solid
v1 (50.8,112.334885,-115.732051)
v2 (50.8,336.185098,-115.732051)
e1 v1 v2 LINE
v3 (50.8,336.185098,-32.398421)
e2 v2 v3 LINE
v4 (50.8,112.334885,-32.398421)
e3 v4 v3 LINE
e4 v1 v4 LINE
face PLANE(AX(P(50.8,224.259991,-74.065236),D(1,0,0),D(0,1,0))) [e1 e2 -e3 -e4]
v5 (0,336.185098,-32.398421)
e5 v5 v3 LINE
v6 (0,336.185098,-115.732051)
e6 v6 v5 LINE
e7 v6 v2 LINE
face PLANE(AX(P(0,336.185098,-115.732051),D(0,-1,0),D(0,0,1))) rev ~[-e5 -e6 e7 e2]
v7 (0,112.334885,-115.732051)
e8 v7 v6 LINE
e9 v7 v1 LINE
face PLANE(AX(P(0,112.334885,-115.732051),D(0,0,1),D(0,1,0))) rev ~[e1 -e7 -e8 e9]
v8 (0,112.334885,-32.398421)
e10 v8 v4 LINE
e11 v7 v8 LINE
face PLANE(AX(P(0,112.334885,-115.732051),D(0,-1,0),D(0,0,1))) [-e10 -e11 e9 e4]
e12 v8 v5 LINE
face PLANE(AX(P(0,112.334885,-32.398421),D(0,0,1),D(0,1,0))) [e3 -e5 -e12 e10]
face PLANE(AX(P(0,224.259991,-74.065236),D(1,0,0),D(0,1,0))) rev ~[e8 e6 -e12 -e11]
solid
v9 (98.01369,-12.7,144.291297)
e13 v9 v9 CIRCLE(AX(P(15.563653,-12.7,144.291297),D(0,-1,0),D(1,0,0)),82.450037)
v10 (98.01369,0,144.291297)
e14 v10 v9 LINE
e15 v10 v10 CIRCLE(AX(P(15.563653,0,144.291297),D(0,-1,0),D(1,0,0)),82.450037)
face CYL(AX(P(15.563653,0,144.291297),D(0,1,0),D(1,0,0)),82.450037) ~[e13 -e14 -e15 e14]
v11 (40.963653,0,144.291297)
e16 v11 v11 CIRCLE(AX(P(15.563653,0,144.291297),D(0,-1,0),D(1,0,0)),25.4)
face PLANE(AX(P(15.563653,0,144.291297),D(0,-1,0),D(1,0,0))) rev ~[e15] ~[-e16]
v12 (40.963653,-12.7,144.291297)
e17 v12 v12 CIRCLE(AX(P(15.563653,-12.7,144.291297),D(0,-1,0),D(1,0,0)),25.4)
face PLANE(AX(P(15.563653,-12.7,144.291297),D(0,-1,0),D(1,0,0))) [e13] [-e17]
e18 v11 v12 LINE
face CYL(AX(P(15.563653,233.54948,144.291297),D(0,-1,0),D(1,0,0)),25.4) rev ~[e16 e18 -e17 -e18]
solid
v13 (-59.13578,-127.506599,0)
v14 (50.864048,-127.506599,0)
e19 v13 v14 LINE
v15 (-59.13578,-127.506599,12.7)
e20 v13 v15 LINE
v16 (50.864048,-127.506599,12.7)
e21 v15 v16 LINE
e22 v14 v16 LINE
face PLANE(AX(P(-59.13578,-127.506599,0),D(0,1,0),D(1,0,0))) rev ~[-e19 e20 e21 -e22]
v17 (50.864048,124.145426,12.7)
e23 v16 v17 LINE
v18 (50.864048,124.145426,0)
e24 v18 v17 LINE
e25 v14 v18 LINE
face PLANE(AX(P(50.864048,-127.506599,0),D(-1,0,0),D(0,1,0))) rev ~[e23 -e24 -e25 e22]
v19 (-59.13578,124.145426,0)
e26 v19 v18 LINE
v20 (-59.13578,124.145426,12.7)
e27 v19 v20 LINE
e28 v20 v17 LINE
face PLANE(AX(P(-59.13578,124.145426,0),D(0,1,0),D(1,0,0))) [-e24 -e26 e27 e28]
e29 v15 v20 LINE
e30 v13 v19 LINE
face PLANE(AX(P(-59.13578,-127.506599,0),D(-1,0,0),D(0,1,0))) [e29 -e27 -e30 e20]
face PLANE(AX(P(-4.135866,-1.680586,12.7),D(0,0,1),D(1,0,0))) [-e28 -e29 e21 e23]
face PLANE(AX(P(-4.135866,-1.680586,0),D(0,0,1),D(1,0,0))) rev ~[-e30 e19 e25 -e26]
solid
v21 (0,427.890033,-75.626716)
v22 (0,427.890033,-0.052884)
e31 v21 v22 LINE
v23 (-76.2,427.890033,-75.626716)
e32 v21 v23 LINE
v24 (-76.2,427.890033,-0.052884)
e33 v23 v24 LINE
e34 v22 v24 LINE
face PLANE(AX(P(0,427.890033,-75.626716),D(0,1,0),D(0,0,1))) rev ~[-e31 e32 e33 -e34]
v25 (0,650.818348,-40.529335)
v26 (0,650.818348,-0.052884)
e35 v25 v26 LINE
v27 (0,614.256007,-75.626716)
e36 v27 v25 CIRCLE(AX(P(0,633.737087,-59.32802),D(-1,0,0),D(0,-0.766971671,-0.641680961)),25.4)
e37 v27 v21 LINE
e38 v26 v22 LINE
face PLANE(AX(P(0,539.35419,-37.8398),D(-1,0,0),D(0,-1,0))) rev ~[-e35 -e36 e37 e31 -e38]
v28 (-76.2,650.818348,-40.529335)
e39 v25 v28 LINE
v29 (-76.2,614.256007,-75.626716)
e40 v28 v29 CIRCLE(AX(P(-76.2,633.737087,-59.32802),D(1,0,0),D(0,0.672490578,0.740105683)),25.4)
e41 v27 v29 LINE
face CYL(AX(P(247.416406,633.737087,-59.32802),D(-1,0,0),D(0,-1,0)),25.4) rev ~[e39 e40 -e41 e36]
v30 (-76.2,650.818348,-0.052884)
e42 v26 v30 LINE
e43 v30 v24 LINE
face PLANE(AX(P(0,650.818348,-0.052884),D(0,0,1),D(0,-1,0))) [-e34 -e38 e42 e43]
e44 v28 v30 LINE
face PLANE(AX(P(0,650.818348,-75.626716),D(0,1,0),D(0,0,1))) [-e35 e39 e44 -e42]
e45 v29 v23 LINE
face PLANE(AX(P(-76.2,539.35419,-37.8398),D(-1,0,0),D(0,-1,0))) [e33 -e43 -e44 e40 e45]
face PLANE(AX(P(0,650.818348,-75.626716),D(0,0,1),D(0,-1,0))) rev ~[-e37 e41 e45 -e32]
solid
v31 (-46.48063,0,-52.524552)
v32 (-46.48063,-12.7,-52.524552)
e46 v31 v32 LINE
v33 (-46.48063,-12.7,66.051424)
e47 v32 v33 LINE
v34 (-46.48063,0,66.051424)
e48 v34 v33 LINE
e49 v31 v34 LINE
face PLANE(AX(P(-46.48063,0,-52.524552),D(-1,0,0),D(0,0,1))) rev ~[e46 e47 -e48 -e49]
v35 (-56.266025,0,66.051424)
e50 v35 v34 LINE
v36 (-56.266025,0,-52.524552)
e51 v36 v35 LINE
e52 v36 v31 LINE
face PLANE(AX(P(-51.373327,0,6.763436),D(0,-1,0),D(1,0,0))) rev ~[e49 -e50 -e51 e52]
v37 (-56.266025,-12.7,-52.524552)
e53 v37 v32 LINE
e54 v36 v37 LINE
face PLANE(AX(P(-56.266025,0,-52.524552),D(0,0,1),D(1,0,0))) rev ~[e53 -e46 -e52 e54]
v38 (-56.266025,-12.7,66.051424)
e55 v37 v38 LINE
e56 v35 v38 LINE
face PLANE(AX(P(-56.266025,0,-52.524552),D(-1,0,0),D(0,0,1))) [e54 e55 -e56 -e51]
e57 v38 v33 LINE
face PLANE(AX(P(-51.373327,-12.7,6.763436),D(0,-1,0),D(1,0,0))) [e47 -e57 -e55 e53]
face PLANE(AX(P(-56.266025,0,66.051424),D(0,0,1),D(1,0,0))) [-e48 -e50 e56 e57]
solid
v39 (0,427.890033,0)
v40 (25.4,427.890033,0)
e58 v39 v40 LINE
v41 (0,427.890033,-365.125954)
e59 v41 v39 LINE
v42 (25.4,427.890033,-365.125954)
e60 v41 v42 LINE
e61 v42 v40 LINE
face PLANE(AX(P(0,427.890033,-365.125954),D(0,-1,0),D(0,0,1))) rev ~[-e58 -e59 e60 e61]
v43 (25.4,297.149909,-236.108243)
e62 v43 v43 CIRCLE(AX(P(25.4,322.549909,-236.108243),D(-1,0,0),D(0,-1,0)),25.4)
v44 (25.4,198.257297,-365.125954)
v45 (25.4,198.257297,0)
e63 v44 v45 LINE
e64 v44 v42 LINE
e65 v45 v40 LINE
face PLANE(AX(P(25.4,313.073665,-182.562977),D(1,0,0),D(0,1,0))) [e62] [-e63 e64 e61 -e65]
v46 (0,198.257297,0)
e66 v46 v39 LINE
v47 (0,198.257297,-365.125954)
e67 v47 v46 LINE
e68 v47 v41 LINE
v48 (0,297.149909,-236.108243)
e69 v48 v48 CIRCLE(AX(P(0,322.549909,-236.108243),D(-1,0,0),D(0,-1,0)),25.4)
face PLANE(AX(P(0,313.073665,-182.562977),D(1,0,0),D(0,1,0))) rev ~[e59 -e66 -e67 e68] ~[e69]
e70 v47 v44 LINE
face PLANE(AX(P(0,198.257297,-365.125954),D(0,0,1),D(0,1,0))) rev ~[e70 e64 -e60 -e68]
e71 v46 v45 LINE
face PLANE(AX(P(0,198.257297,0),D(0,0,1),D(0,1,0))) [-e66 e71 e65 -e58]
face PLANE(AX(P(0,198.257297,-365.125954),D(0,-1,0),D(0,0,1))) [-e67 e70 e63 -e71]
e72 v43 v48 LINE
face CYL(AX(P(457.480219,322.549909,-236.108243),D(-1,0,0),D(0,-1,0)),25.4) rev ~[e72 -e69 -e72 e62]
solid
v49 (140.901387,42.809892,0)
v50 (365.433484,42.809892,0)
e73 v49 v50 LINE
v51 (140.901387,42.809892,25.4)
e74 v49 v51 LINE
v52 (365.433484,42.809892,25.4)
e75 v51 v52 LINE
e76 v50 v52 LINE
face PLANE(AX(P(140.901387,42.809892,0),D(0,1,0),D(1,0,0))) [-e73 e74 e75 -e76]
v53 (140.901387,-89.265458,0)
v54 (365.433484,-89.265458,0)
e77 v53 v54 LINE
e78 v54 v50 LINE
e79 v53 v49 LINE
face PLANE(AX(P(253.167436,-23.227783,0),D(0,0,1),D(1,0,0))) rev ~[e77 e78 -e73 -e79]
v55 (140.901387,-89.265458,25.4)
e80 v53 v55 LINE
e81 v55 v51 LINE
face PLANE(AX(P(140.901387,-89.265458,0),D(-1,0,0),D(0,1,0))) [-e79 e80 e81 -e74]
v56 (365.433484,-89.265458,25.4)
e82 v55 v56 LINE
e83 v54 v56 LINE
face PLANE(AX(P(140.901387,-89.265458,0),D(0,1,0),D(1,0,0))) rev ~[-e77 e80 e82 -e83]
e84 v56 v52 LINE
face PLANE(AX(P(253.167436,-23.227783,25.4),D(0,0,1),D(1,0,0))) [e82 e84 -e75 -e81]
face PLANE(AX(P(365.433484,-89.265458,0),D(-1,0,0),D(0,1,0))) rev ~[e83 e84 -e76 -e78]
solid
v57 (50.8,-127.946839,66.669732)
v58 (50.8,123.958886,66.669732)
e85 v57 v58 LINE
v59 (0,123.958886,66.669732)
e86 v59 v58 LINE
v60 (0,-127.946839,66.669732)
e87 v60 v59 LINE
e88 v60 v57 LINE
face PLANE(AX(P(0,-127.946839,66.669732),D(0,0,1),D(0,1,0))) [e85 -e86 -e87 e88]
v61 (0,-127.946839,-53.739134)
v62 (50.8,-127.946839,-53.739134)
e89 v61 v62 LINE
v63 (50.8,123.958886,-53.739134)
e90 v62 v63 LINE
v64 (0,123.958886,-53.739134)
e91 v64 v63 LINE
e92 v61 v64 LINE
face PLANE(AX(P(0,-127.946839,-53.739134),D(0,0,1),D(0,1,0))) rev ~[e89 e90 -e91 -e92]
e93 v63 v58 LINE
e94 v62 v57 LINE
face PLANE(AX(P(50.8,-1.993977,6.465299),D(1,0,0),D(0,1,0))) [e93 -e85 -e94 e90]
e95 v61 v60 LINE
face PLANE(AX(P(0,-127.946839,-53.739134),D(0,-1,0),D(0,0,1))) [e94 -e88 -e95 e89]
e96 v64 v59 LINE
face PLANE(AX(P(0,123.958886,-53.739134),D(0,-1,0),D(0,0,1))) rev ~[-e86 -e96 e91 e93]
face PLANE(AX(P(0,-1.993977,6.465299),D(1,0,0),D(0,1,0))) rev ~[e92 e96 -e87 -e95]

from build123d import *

# Parameters (mm, degrees)
F0_W      = 251.9057244062
F0_H      = 120.4088665545
F1_DEPTH  = 50.8
F2_W      = 9.7853951156
F2_H      = 118.5759752989
F3_DEPTH  = 12.7
F5_DEPTH  = 12.7
F6_W      = 109.9998280406
F6_H      = 251.6520246863
F7_DEPTH  = 12.7
F9_D      = 50.8
F10_W     = 224.532097578
F10_H     = 132.0753507316
F11_DEPTH = 25.4
F12_W     = 229.6327352524
F12_H     = 365.1259541512
F13_DEPTH = 25.4
F18_W     = 223.8502129912
F18_H     = 83.3336301148
F19_DEPTH = 50.8
F20_W     = 222.9283154011
F20_H     = 75.5738317966
F21_DEPTH = 76.2
F23_D     = 50.8
F25_D     = 50.8


# Not quite as in the source:
# - the program builds the solid bodies; features that only make, move or delete a surface that nothing else refers to are left out


with BuildPart() as f1:
    # F0 (on Right) → F1 (new body)
    with BuildSketch(Plane.YZ):
        with Locations((-1.9939765334, 6.465299055)):
            Rectangle(F0_W, F0_H)
    extrude(amount=F1_DEPTH)


with BuildPart() as f3:
    # F2 (on Front) → F3 (new body)
    with BuildSketch(Plane.XZ):
        with Locations((-51.3733271509, 6.7634359002)):
            Rectangle(F2_W, F2_H)
    extrude(amount=F3_DEPTH)


with BuildPart() as f5:
    # F4 (on Front) → F5 (new body)
    with BuildSketch(Plane.XZ):
        with BuildLine():
            ThreePointArc((39.5767722748, 65.4155793169), (81.8127708761, 95.209089617), (98.0136903376, 144.2912966013))
            ThreePointArc((98.0136903376, 144.2912966013), (-50.6854651748, 193.3735035856), (39.5767722748, 65.4155793169))
        make_face()
    extrude(amount=F5_DEPTH)

    # F9 (through all)
    with Locations(Plane(origin=(0, 0, 0), x_dir=(-1, 0, 0), z_dir=(0, 1, 0))):
        with Locations((-15.5636528507, 144.2912966013)):
            Hole(F9_D / 2)


with BuildPart() as f7:
    # F6 (on Top) → F7 (new body)
    with BuildSketch(Plane.XY):
        with Locations((-4.1358657181, -1.6805864871)):
            Rectangle(F6_W, F6_H)
    extrude(amount=F7_DEPTH)


with BuildPart() as f11:
    # F10 (on Top) → F11 (new body)
    with BuildSketch(Plane.XY):
        with Locations((253.1674355268, -23.22778292)):
            Rectangle(F10_W, F10_H)
    extrude(amount=F11_DEPTH)


with BuildPart() as f13:
    # F12 (on Right) → F13 (new body)
    with BuildSketch(Plane.YZ):
        with Locations((313.0736649036, -182.5629770756)):
            Rectangle(F12_W, F12_H)
    extrude(amount=F13_DEPTH)

    # F23 (through all)
    with Locations(Plane.YZ.offset(25.4)):
        with Locations((322.5499093533, -236.1082434654)):
            Hole(F23_D / 2)


with BuildPart() as f19:
    # F18 (on Right) → F19 (new body)
    with BuildSketch(Plane.YZ):
        with Locations((224.2599911988, -74.0652363747)):
            Rectangle(F18_W, F18_H)
    extrude(amount=F19_DEPTH)


with BuildPart() as f21:
    # F20 (on face) → F21 (new body)
    with BuildSketch(Plane(origin=(0, 0, 0), x_dir=(0, -1, 0), z_dir=(-1, 0, 0))):
        with Locations((-539.3541902304, -37.8398001194)):
            Rectangle(F20_W, F20_H)
    extrude(amount=F21_DEPTH)

    # F25 (through all)
    with Locations(Plane.YZ):
        with Locations((633.7370872498, -59.328019619)):
            Hole(F25_D / 2)


solid = Compound([f1.part, f3.part, f5.part, f7.part, f11.part, f13.part, f19.part, f21.part])
